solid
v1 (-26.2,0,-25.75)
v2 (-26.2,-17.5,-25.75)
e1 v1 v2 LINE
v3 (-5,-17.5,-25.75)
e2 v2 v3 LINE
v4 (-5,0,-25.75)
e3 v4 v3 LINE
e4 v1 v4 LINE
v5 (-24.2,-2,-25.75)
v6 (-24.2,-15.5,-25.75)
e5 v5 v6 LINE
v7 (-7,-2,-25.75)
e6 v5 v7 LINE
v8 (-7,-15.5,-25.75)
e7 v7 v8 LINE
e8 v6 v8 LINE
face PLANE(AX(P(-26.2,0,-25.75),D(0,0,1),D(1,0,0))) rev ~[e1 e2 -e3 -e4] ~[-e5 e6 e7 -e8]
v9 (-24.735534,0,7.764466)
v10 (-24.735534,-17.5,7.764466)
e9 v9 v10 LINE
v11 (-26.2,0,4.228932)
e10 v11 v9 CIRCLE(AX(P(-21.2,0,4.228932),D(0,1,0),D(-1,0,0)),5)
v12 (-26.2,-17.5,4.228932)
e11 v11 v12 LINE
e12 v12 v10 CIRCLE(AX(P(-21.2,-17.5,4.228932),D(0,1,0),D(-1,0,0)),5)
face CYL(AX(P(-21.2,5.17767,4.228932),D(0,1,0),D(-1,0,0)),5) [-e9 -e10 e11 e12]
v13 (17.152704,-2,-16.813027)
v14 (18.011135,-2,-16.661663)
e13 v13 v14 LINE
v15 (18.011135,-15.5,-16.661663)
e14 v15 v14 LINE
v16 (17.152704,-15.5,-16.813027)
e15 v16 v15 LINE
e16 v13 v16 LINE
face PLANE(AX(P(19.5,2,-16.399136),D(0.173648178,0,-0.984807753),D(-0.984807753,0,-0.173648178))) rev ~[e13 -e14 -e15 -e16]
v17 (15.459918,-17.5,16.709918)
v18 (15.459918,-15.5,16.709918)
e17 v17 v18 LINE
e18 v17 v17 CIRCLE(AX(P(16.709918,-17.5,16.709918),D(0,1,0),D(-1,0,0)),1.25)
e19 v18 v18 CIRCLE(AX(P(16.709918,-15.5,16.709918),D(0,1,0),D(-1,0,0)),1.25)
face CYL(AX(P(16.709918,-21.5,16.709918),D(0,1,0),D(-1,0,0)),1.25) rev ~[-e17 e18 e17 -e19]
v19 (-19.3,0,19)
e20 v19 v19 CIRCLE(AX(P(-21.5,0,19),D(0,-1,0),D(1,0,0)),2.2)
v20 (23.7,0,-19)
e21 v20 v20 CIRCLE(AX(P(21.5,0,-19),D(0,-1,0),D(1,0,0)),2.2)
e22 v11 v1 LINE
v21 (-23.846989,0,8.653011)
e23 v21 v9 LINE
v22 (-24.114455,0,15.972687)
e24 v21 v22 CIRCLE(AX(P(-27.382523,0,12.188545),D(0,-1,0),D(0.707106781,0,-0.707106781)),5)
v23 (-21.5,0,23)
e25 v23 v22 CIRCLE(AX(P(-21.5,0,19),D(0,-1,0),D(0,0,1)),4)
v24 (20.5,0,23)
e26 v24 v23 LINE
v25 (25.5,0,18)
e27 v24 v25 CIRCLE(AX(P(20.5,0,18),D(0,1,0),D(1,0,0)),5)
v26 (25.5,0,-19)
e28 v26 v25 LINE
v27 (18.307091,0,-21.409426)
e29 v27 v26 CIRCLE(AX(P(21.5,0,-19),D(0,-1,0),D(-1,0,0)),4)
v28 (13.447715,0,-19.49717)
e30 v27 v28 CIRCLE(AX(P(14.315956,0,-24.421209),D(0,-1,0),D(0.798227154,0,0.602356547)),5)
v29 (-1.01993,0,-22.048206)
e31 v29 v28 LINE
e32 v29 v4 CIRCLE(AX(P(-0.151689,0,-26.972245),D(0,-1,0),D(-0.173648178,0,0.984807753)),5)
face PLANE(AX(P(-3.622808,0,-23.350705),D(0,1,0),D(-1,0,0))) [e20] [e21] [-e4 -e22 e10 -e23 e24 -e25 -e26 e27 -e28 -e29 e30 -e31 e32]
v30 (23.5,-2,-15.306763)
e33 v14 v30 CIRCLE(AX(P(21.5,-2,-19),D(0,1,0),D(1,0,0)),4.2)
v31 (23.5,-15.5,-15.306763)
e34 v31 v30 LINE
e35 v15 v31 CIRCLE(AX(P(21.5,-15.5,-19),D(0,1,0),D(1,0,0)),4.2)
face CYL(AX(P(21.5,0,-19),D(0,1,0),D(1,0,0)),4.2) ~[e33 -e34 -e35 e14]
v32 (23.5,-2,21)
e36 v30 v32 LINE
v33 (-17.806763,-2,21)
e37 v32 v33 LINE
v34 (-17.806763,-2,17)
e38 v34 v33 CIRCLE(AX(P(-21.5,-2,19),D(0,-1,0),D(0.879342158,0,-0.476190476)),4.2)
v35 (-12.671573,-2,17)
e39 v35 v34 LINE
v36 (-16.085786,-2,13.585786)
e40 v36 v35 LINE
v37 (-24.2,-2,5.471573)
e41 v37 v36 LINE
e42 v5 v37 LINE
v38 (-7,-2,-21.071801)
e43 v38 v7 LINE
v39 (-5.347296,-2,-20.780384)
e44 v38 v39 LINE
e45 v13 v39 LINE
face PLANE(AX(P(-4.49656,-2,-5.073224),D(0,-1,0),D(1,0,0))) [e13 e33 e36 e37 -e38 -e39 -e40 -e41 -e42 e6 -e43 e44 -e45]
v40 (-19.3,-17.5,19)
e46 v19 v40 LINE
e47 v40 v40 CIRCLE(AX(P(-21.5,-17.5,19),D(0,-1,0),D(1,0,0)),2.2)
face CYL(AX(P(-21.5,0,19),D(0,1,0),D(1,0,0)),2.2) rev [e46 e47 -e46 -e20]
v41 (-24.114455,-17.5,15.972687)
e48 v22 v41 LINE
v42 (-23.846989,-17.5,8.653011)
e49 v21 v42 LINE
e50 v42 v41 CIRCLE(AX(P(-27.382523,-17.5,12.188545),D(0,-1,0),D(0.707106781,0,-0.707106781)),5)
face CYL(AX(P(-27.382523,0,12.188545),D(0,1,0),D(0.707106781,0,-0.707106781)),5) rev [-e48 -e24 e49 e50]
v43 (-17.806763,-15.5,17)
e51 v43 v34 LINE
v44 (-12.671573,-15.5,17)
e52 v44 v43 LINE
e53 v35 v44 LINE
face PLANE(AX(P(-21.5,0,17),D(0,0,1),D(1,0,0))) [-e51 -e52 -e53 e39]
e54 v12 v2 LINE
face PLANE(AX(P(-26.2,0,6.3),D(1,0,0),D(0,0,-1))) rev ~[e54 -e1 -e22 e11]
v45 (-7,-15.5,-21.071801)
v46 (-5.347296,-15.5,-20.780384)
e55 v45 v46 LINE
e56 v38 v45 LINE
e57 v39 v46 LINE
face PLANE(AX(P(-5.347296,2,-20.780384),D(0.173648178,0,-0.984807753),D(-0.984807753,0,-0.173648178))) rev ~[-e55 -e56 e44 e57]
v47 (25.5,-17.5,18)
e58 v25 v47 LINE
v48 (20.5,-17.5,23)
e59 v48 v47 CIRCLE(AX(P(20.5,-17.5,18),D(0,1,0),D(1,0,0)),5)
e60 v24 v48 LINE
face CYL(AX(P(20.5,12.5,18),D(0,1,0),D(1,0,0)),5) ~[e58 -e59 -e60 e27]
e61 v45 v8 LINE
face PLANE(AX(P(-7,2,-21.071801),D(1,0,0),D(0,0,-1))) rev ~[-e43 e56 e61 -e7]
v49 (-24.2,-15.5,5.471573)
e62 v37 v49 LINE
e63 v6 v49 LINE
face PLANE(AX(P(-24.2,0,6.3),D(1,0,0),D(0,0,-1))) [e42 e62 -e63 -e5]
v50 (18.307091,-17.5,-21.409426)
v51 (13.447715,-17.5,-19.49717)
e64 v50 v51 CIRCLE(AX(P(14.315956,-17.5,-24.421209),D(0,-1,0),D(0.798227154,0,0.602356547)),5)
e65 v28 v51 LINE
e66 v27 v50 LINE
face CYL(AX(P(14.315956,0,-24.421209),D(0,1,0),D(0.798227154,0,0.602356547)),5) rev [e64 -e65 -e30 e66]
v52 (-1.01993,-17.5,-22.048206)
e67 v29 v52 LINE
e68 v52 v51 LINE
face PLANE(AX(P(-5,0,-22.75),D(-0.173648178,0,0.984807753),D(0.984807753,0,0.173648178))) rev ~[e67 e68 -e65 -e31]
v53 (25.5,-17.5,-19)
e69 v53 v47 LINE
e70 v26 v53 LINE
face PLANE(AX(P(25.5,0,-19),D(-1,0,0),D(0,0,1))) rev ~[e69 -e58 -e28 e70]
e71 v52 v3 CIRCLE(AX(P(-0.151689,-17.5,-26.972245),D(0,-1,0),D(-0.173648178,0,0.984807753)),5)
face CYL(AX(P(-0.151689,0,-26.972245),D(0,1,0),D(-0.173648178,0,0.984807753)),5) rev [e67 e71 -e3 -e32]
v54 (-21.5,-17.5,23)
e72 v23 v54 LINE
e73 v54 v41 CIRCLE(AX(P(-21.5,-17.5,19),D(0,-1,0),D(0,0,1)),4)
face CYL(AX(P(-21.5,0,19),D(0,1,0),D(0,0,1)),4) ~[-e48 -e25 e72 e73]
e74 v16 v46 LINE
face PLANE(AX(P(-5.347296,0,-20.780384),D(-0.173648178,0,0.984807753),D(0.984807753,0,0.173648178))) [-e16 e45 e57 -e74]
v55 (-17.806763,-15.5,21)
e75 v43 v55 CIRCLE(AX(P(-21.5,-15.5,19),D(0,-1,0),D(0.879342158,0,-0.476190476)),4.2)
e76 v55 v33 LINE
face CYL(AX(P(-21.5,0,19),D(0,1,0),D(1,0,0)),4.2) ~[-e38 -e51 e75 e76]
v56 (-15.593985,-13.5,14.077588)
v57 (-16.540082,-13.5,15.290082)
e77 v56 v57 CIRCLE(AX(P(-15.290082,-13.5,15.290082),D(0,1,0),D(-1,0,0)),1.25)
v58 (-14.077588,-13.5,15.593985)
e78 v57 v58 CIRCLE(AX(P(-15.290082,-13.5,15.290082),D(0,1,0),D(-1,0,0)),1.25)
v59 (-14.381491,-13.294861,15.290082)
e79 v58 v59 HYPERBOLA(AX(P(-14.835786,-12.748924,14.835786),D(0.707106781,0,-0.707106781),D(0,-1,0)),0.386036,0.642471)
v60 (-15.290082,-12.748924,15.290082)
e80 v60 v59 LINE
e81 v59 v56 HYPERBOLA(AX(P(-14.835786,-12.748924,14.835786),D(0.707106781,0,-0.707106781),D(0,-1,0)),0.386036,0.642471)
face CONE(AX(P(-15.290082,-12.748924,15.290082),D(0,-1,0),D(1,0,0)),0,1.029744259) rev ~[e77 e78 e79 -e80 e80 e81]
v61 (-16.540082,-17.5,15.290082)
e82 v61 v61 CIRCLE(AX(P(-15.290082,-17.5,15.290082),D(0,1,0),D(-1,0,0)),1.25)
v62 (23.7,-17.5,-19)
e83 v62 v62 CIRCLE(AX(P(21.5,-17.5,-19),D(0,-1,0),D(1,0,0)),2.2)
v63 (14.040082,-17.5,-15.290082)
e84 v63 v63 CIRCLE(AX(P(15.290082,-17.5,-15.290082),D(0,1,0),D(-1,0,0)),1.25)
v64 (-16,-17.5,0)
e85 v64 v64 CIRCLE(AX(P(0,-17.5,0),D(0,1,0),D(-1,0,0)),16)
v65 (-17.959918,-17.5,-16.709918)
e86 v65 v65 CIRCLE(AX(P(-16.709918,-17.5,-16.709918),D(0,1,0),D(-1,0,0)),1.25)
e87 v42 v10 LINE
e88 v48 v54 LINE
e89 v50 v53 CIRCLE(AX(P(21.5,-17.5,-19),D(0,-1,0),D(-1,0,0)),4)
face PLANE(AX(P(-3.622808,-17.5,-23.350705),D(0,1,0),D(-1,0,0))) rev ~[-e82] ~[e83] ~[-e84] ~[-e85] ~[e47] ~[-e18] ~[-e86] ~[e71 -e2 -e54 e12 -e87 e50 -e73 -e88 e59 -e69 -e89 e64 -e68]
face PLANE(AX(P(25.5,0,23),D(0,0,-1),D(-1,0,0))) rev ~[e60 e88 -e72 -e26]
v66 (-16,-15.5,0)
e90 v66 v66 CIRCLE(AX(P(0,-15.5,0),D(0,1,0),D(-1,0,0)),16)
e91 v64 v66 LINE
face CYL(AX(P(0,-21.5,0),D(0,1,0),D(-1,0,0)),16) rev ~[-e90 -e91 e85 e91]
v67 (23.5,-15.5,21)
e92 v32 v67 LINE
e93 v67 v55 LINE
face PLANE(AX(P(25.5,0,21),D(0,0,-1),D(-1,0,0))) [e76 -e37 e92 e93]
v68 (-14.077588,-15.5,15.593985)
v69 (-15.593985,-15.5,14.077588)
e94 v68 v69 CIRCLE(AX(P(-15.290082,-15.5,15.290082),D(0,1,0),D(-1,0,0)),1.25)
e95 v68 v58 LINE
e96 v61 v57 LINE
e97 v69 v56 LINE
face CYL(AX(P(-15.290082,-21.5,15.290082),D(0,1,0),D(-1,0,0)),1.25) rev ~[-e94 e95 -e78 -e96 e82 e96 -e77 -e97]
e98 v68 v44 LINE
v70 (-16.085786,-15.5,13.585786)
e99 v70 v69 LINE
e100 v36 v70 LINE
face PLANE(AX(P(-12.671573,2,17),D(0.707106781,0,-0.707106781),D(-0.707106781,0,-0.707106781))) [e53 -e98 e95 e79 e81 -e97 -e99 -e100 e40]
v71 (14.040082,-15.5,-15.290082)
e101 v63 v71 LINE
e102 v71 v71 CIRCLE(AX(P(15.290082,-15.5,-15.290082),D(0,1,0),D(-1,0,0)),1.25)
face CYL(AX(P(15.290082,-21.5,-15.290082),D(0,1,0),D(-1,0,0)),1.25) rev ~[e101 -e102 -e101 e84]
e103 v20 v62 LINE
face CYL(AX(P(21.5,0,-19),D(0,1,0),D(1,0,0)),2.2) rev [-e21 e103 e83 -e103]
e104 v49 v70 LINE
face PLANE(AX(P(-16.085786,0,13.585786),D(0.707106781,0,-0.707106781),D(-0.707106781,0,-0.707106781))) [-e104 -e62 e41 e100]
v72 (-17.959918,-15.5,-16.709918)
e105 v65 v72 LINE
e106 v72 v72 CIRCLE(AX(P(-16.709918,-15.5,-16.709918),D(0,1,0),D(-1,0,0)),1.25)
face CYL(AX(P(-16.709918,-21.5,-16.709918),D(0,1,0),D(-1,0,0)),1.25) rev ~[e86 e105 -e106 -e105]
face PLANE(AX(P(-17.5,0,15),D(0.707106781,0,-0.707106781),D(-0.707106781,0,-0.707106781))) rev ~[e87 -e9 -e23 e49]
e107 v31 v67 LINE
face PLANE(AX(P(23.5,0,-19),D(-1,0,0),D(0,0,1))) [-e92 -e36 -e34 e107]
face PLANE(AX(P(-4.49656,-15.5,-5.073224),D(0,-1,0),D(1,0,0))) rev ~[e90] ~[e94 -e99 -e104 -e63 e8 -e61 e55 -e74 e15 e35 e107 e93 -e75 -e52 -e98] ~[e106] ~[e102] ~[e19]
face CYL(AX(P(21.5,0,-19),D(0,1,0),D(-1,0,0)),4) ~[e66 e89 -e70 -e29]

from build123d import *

# Parameters (mm, degrees)
F0_R        = 2.2
F1_DEPTH    = 17.5
F3_DEPTH    = 17.5
F4_T        = 2
F4_T3_DEPTH = 21.5
F5_T1_DEPTH = 17.5
F5_T3_DEPTH = 17.5
F5_T5_DEPTH = 17.5
F5_T7_DEPTH = 42.5
F5_T9_DEPTH = 27.8553390593
F7_D        = 32
F7_DEPTH    = 4
F7_TIP      = 9.6137699044
F8_D        = 2.5
F8_DEPTH    = 4
F8_TIP      = 0.7510757738


# Not quite as in the source:
# - a fillet or chamfer that OpenCascade refuses, or shapes differently, is made with other operations: its cross-section is extruded or revolved along the edge and cut away or added
# - a shell that OpenCascade refuses in one call is made with other operations: the cavity is built on its own and cut out


with BuildPart() as f1:
    # F0 (on Front) → F1 (new body)
    with BuildSketch(Plane.XZ):
        with BuildLine():
            Line((25.5, -19), (25.5, 23))
            Line((25.5, 23), (-21.5, 23))
            ThreePointArc((-21.5, 23), (-25.5, 19), (-21.5, 15))
            Line((-21.5, 15), (17.5, 15))
            Line((17.5, 15), (17.5, -19))
            ThreePointArc((17.5, -19), (21.5, -23), (25.5, -19))
        make_face()
        with Locations((21.5, -19)):
            Circle(F0_R, mode=Mode.SUBTRACT)
        with Locations((-21.5, 19)):
            Circle(F0_R, mode=Mode.SUBTRACT)
    extrude(amount=F1_DEPTH)

    # F2 (on Front) → F3 (join, through all)
    with BuildSketch(Plane.XZ):
        Polygon((17.5, -18.7826429341), (17.5, 15), (-17.5, 15), (-26.2, 6.3), (-26.2, -25.75), (-5, -25.75), (-5, -22.75), align=None)
    extrude(amount=F3_DEPTH)

    # F4: shell of thickness 2, made by hand


with BuildPart() as f4_core1:
    # F4_t2: copy of F1
    add(f1.part)

    # the walls: a layer under each face that stays
    f4_faces = [f4_core1.faces().sort_by_distance(p)[0] for p in [
        (25.5, -8.75, 2),
        (21.5, -8.75, -23),
        (2, -8.75, 23),
        (-0.35, 0, -1.375),
        (-0.35, -17.5, -1.375),
        (17.5, -8.75, -18.891321467),
        (-25.5, -8.75, 19),
        (-19.5, -8.75, 15),
        (19.3, -8.75, -19),
        (-23.7, -8.75, 19),
        (6.25, -8.75, -20.766321467),
        (-21.85, -8.75, 10.65),
        (-26.2, -8.75, -9.725),
        (-5, -8.75, -24.25),
    ]]
    thicken(f4_faces, amount=-F4_T, mode=Mode.SUBTRACT)

    # F4_s4 → F4_t3 (cut)
    with BuildSketch(Plane.XZ.offset(-2)):
        Polygon((17.4834729636, -18.8023390891), (19.5, -18.7826429341), (19.5, -16.3991357489), (17.1527036447, -16.813027428), align=None)
        Polygon((-17.5141421356, 14.9941421356), (-17.5, 17), (-12.6715728753, 17), (-16.0857864376, 13.5857864376), align=None)
        Polygon((-4.9765270364, -22.7696961551), (-5.3472963553, -20.780384494), (-7, -21.0718007376), (-7, -22.75), align=None)
    extrude(amount=F4_T3_DEPTH, mode=Mode.SUBTRACT)


with BuildPart() as f1_1:
    add(f1.part)

    # what is left inside the walls is the cavity
    f4_cavity = [f4_core1.part.solids().sort_by_distance(p)[0] for p in [
        (-0.35, -15.48, -10.166667),
    ]]
    add(f4_cavity, mode=Mode.SUBTRACT)

    # F5: fillet of radius 5 on 5 edges, made by hand

    # F5_s2 → F5_t1 (join)
    with BuildSketch(Plane.XZ):
        with BuildLine():
            ThreePointArc((18.307091383, -21.4094261897), (16.1468840352, -19.7684999194), (13.4477147235, -19.4971701618))
            Line((13.4477147235, -19.4971701618), (13.3608906347, -19.0047662853))
            Line((13.3608906347, -19.0047662853), (17.4131759112, -18.2902390576))
            Line((17.4131759112, -18.2902390576), (18, -18.7826429341))
            ThreePointArc((18, -18.7826429341), (18, -19), (18.7062049602, -21.108247916))
            Line((18.7062049602, -21.108247916), (18.307091383, -21.4094261897))
        make_face()
    extrude(amount=F5_T1_DEPTH)

    # F5_s4 → F5_t3 (join)
    with BuildSketch(Plane.XZ):
        with BuildLine():
            ThreePointArc((-23.8469891482, 8.6530108518), (-22.3858577587, 12.3711260424), (-24.1144546907, 15.972686559))
            Line((-24.1144546907, 15.972686559), (-23.7876478544, 16.3511007391))
            ThreePointArc((-23.7876478544, 16.3511007391), (-21.5, 15.5), (-17.5, 15.5))
            Line((-17.5, 15.5), (-17.1464466094, 14.6464466094))
            Line((-17.1464466094, 14.6464466094), (-23.4934357576, 8.2994574612))
            Line((-23.4934357576, 8.2994574612), (-23.8469891482, 8.6530108518))
        make_face()
    extrude(amount=F5_T3_DEPTH)

    # F5_s6 → F5_t5 (join)
    with BuildSketch(Plane.XZ):
        with BuildLine():
            ThreePointArc((-1.0199301517, -22.0482063006), (-3.5569146257, -23.311037583), (-5, -25.75))
            Line((-5, -25.75), (-5, -22.75))
            Line((-5, -22.75), (-1.0199301517, -22.0482063006))
        make_face()
    extrude(amount=F5_T5_DEPTH)

    # F5_s8 → F5_t7 (cut)
    with BuildSketch(Plane.XZ.offset(-12.5)):
        with BuildLine():
            ThreePointArc((25.5, 18), (24.0355339059, 21.5355339059), (20.5, 23))
            Line((20.5, 23), (25.5, 23))
            Line((25.5, 23), (25.5, 18))
        make_face()
    extrude(amount=F5_T7_DEPTH, mode=Mode.SUBTRACT)

    # F5_s10 → F5_t9 (cut)
    with BuildSketch(Plane.XZ.offset(-5.1776695297)):
        with BuildLine():
            ThreePointArc((-26.2, 4.2289321881), (-25.8193976626, 6.14234935), (-24.7355339059, 7.7644660941))
            Line((-24.7355339059, 7.7644660941), (-26.2, 6.3))
            Line((-26.2, 6.3), (-26.2, 4.2289321881))
        make_face()
    extrude(amount=F5_T9_DEPTH, mode=Mode.SUBTRACT)

    # F7
    with Locations(Plane.XZ.offset(17.5)):
        with Locations((0, 0)):
            Hole(F7_D / 2, depth=F7_DEPTH)
            with Locations((0, 0, -(F7_DEPTH + F7_TIP / 2))):  # 118° drill point
                Cone(0, F7_D / 2, F7_TIP, mode=Mode.SUBTRACT)

    # F8
    with Locations(Plane.XZ.offset(17.5)):
        with Locations((-15.2900823734, 15.2900823734), (-16.7099176266, -16.7099176266), (15.2900823734, -15.2900823734), (16.7099176266, 16.7099176266)):
            Hole(F8_D / 2, depth=F8_DEPTH)
            with Locations((0, 0, -(F8_DEPTH + F8_TIP / 2))):  # 118° drill point
                Cone(0, F8_D / 2, F8_TIP, mode=Mode.SUBTRACT)


solid = f1_1.part
